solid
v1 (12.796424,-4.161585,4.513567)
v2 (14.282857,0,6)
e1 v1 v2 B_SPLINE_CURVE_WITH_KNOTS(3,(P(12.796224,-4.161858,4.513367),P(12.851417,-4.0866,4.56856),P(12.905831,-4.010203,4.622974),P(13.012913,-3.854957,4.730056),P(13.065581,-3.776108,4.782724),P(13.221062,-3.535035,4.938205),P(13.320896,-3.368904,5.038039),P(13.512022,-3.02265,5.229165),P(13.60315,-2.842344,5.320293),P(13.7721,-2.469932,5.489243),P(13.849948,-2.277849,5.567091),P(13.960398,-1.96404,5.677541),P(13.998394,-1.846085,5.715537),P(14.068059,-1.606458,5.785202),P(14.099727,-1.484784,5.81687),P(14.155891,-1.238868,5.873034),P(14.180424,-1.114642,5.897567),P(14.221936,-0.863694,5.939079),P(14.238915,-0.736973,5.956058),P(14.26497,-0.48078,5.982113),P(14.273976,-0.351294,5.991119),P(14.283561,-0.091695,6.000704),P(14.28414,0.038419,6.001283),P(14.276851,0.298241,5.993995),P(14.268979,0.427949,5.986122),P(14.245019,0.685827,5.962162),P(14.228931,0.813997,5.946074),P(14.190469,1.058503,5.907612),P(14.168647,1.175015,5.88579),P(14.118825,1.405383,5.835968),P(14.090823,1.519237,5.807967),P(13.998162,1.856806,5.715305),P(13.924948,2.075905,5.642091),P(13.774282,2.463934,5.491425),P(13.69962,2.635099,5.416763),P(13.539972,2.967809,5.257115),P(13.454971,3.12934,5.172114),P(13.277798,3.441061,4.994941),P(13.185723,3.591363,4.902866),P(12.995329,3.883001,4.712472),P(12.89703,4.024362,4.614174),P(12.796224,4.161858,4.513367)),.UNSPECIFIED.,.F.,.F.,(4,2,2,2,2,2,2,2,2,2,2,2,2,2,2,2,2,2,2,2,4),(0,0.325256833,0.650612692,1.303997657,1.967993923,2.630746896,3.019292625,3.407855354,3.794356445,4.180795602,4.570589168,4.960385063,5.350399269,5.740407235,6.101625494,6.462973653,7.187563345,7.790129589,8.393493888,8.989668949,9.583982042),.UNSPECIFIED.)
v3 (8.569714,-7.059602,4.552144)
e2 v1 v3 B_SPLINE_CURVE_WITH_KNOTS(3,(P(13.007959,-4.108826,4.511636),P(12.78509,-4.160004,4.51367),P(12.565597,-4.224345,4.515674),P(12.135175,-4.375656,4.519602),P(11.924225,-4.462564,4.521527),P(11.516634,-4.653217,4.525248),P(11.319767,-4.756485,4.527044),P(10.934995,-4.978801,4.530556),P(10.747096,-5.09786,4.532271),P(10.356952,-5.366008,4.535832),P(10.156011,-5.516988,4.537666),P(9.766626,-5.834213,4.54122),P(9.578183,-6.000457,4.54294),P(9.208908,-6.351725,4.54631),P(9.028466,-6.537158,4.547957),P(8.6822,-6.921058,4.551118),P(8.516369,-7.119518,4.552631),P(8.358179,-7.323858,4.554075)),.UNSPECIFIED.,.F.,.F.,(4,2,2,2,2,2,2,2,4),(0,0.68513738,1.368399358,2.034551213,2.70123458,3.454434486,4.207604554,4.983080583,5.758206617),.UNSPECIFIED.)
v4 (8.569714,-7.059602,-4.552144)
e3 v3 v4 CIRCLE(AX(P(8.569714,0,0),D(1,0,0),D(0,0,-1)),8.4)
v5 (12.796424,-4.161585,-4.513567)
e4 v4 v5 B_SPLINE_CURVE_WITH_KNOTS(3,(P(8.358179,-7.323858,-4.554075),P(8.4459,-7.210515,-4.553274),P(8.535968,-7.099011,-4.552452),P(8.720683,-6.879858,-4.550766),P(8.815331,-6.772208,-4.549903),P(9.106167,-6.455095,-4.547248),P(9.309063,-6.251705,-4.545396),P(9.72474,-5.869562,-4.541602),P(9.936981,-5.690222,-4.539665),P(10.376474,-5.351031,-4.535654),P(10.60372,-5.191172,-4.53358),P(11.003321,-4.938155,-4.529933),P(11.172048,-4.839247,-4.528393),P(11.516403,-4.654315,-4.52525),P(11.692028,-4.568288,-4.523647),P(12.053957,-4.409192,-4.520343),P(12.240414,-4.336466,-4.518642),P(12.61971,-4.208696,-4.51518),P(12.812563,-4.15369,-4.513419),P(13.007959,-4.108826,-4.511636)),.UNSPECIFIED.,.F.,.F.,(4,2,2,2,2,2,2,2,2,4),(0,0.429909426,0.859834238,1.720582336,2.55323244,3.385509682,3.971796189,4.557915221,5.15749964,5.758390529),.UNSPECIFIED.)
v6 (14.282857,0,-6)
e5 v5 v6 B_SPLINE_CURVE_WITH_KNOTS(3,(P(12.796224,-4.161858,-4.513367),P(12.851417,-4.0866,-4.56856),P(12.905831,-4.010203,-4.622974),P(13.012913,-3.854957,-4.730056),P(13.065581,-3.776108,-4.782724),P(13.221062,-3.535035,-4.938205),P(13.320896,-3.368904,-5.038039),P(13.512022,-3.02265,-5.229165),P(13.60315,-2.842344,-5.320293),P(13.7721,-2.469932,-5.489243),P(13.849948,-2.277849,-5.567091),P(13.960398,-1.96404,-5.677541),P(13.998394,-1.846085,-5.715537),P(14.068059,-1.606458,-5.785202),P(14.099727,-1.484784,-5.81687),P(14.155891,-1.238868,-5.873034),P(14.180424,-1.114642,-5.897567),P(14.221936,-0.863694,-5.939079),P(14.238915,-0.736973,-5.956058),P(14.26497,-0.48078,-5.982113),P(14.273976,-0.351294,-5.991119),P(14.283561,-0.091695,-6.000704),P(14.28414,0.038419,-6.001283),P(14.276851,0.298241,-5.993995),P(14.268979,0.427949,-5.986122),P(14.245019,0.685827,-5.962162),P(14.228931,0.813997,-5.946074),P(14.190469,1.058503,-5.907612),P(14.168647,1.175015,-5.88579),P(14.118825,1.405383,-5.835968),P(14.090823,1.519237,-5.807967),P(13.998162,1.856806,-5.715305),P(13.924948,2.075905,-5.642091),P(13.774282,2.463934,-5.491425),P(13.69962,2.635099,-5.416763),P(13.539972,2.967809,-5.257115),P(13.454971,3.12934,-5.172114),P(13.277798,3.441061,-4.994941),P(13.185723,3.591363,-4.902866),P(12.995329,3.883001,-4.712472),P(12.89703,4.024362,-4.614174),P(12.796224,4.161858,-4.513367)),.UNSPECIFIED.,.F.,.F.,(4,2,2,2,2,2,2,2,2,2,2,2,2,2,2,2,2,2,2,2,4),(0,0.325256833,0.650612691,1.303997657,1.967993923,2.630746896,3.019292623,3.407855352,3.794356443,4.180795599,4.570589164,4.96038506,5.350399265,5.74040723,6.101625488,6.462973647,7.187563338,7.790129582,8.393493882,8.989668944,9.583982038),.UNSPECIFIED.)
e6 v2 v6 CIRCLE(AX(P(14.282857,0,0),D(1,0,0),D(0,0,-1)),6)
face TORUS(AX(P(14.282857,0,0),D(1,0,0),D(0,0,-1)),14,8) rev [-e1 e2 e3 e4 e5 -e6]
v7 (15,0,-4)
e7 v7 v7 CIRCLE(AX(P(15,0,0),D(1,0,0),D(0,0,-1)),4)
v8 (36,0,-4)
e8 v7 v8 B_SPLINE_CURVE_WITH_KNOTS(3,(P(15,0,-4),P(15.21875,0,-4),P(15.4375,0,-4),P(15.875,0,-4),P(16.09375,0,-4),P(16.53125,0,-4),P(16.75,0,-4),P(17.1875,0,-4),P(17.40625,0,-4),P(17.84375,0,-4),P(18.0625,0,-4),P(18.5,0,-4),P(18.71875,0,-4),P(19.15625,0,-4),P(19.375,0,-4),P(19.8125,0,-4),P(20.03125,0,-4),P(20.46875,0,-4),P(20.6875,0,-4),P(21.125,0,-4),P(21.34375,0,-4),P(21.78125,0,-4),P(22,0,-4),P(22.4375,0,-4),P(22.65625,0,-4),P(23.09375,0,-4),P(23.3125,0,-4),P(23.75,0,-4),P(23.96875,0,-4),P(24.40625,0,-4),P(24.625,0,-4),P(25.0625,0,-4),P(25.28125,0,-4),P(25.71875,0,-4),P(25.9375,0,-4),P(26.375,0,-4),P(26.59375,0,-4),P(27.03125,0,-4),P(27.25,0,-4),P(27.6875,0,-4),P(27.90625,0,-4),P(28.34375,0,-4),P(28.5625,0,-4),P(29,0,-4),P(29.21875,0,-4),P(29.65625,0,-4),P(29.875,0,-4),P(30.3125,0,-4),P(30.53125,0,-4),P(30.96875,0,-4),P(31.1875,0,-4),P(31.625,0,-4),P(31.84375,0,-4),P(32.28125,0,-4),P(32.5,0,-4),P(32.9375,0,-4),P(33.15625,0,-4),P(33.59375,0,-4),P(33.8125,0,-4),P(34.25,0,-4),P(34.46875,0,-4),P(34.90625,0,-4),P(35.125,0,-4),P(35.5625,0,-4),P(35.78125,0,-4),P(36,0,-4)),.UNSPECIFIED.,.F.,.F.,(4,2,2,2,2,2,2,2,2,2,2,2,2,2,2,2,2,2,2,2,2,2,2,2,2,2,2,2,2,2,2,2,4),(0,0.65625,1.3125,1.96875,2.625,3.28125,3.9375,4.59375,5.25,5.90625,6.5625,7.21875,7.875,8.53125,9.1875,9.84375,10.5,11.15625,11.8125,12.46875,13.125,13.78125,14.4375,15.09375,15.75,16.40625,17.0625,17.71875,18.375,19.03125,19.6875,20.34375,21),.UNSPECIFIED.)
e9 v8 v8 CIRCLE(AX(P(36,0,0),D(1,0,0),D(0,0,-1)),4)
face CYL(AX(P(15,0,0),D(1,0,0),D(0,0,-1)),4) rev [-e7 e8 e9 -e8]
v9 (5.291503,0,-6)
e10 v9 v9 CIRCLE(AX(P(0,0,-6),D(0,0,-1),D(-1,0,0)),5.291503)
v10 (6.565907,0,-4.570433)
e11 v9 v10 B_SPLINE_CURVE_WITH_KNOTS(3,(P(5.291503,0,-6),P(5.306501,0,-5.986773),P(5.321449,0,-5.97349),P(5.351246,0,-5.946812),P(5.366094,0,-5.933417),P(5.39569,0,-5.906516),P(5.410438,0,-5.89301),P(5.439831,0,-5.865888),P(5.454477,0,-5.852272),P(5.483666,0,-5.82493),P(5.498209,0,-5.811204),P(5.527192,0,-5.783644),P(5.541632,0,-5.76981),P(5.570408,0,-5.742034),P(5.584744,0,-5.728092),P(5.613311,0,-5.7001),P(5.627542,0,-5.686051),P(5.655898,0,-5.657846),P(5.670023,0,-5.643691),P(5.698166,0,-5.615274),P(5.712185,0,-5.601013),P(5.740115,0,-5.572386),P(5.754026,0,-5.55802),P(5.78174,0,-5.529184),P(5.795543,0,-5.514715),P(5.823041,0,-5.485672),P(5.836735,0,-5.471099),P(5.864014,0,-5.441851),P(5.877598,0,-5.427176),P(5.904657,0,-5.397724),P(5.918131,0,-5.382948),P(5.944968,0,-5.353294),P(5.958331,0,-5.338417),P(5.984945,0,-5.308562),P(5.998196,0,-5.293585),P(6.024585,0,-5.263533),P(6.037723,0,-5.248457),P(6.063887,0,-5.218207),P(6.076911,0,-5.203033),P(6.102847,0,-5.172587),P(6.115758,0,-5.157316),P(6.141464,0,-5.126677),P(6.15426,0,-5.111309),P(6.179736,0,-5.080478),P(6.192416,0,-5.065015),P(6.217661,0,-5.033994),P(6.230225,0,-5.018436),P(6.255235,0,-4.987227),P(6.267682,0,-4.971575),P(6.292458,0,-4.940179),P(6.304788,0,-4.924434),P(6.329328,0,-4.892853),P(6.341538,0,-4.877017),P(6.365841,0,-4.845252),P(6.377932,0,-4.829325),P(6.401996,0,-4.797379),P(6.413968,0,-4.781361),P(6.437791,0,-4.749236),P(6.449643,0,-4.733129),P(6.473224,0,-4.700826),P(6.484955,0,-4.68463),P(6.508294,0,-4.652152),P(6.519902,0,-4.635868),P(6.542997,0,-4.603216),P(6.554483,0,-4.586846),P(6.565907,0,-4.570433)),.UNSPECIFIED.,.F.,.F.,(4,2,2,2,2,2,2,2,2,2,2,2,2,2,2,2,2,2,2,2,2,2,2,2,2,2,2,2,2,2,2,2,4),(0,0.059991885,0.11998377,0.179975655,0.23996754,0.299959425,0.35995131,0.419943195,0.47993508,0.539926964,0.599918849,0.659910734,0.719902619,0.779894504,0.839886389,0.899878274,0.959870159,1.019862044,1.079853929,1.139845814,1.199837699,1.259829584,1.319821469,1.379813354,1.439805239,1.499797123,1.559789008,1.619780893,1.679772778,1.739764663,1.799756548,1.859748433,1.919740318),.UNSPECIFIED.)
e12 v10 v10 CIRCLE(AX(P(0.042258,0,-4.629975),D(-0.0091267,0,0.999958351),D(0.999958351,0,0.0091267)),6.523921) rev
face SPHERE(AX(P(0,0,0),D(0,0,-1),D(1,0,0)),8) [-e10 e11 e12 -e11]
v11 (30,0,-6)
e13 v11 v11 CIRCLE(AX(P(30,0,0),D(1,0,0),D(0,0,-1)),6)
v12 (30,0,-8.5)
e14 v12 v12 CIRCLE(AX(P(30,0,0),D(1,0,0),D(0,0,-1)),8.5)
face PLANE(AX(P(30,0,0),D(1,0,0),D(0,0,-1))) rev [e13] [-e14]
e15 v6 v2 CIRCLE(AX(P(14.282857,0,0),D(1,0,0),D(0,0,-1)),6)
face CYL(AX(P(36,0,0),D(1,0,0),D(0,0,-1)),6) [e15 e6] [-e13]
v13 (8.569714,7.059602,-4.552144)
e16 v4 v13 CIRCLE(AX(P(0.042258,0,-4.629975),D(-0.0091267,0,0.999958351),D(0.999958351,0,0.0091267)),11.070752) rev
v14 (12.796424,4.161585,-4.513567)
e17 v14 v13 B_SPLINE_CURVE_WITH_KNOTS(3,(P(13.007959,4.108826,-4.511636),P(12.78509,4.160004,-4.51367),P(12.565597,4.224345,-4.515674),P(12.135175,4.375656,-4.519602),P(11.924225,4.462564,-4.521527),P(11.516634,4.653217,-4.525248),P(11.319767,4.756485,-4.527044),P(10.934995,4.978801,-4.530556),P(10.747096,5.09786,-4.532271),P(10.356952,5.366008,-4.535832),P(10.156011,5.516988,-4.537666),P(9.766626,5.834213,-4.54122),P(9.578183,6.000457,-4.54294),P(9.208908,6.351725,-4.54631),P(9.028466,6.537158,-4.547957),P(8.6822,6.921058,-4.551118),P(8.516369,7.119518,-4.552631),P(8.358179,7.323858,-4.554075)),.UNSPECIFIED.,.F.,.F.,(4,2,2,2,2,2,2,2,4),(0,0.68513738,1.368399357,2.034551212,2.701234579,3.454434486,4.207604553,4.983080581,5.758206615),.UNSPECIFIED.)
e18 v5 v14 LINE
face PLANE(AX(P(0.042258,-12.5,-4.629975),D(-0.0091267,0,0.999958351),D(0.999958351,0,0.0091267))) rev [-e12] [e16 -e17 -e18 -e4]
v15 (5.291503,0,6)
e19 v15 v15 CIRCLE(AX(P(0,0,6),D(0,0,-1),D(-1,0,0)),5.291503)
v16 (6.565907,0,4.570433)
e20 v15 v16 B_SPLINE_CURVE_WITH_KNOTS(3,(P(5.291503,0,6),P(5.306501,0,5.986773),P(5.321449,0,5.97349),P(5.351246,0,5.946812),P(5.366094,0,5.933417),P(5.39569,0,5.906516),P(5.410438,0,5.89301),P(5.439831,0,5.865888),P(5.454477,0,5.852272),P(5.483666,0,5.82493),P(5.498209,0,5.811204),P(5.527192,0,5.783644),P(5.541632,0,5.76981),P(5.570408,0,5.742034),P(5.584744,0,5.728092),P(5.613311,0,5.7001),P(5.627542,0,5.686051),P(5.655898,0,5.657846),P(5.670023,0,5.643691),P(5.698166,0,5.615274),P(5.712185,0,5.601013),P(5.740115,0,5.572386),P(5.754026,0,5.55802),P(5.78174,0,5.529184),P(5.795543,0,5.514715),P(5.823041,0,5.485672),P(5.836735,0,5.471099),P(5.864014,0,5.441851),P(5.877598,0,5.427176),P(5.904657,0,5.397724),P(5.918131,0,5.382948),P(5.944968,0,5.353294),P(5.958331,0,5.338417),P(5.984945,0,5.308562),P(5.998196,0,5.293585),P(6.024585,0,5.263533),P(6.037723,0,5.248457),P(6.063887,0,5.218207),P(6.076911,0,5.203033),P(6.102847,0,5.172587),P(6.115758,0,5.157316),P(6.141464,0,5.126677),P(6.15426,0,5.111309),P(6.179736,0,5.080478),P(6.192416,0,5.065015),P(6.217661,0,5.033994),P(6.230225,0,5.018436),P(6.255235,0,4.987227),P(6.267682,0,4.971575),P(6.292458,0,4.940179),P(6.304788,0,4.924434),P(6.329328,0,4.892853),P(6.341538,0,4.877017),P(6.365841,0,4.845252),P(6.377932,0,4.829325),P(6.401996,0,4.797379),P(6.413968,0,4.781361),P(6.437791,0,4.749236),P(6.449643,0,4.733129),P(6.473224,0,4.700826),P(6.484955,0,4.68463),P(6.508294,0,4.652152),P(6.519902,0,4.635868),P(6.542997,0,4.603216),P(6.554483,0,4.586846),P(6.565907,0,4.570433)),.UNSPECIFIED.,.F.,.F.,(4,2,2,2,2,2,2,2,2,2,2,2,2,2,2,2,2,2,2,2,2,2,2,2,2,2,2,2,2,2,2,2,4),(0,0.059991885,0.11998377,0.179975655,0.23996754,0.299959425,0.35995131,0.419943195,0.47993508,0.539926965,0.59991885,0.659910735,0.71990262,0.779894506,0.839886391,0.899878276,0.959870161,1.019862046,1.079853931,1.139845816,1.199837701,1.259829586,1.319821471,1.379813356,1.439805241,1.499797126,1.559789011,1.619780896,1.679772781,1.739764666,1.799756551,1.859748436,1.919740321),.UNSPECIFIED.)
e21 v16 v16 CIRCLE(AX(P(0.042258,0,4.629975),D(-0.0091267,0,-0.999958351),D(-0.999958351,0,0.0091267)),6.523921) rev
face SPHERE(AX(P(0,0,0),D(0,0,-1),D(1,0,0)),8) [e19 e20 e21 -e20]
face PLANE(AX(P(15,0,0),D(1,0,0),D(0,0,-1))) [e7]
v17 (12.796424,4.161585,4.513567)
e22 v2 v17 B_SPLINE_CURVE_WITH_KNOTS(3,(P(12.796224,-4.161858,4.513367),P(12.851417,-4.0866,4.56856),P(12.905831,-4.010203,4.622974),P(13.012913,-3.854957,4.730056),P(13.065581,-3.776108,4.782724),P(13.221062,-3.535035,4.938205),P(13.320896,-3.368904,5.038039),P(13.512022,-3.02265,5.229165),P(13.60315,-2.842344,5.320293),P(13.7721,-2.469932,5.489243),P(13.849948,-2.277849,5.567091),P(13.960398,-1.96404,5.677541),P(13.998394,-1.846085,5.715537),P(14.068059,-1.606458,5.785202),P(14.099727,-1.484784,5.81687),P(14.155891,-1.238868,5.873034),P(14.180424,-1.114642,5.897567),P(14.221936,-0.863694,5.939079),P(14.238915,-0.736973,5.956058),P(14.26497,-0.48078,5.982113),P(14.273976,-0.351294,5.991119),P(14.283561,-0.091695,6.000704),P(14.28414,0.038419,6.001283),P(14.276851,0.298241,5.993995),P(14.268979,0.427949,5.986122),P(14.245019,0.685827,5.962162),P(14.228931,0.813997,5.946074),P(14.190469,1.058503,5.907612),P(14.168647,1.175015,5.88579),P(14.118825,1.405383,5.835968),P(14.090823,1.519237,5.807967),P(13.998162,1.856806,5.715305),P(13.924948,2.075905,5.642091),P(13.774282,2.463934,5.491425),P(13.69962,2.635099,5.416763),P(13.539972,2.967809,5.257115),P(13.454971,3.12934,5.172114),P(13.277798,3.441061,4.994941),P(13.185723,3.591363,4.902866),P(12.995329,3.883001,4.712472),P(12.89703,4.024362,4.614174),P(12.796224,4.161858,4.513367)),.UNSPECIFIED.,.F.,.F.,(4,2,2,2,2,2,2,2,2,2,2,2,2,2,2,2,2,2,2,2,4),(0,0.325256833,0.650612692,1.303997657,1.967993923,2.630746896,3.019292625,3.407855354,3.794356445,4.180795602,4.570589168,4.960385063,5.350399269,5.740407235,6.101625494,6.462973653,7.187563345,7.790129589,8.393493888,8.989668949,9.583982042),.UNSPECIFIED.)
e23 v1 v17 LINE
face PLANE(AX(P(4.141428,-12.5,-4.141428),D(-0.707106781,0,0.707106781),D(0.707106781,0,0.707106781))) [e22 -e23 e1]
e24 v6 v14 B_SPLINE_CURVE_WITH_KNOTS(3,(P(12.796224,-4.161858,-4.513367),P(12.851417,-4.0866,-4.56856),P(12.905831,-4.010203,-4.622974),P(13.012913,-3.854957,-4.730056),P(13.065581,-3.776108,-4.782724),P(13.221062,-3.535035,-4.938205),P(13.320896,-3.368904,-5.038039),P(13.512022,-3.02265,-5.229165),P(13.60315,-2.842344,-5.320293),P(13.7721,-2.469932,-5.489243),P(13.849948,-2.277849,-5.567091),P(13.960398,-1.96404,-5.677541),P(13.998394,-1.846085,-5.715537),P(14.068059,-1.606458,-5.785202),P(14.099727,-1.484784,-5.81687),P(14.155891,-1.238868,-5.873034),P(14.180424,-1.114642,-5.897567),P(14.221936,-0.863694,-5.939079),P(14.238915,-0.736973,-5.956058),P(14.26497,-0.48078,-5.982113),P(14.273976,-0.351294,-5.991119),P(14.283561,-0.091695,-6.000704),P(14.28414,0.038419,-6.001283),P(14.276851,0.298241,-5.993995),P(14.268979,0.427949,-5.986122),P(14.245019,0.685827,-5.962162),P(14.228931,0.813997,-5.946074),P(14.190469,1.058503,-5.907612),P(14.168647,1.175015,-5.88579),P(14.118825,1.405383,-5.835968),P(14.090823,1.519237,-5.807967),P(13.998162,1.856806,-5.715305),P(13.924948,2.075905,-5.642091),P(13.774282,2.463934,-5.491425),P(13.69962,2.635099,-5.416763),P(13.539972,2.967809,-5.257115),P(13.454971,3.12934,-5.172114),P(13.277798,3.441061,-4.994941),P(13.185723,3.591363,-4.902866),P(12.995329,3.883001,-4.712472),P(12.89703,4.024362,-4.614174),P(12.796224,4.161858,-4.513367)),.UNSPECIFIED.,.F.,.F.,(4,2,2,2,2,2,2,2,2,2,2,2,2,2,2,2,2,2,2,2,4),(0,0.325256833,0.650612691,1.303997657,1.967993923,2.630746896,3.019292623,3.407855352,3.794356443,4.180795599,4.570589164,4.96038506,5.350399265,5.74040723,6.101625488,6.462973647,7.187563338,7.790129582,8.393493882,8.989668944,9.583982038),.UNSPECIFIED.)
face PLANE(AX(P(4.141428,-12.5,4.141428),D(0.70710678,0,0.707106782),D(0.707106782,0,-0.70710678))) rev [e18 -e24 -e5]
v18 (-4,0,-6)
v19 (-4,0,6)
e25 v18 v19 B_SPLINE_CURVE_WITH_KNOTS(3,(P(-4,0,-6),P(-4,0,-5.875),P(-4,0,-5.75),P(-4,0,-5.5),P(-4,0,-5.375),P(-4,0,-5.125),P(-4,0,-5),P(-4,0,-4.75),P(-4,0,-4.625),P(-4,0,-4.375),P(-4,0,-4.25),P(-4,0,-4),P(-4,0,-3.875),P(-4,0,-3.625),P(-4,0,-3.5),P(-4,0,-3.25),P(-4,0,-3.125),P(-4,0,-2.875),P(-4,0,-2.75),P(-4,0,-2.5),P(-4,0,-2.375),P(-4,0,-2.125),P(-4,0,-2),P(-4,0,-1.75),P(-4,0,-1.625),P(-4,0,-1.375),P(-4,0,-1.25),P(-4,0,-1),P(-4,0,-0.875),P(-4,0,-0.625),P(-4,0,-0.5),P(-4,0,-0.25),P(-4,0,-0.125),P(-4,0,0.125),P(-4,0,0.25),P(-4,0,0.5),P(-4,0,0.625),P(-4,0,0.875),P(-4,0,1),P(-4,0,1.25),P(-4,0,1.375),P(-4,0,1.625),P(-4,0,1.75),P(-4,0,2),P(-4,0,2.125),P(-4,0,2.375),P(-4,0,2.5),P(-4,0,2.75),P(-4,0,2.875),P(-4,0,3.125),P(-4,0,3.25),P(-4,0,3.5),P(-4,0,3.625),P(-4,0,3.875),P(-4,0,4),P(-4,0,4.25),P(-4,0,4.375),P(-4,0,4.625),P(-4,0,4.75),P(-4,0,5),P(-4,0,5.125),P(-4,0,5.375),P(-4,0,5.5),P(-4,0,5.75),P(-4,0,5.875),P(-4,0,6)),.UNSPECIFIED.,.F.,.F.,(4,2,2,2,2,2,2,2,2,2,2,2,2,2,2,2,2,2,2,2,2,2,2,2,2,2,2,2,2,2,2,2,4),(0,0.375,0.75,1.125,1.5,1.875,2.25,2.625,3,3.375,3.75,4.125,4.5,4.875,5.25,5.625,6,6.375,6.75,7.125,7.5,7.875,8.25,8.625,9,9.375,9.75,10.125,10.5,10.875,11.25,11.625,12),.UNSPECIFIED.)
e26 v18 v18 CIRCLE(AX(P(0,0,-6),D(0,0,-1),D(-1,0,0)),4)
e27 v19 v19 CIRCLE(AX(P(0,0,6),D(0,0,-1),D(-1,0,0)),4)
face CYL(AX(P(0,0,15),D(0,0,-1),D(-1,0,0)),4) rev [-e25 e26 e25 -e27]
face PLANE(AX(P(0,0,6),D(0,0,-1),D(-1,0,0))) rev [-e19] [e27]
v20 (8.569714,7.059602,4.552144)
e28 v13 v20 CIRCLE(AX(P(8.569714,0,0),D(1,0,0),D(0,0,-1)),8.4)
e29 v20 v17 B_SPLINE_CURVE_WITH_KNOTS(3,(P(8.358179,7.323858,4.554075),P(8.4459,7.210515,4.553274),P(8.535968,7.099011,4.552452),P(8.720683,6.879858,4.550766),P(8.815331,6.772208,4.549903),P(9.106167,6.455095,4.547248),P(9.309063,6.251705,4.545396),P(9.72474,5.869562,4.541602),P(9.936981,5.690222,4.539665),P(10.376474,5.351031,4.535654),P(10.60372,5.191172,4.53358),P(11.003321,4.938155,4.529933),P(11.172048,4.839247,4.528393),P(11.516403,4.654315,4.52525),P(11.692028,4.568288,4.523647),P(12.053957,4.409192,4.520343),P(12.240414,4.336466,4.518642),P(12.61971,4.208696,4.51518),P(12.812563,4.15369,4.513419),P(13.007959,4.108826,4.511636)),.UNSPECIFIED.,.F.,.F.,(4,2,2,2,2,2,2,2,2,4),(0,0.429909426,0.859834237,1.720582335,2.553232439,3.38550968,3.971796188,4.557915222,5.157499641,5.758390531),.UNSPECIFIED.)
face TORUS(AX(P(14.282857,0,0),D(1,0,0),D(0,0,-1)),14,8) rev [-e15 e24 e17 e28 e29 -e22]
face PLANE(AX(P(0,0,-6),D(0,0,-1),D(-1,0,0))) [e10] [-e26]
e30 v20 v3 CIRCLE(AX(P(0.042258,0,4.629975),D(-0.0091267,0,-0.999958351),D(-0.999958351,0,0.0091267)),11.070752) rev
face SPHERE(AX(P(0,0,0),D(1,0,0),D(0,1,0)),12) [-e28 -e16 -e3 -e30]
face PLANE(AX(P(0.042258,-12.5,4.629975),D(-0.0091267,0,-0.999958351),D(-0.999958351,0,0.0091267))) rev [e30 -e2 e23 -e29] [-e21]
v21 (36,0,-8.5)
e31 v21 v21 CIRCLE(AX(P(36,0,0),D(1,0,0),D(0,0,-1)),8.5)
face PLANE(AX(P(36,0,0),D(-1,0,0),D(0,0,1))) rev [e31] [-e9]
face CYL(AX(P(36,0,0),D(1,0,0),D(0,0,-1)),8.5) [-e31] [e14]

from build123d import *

# Parameters (mm, degrees)
CUT_EXTRUDE_1_DEPTH = 12.5
SKETCH_4_R          = 4
CUT_EXTRUDE_2_DEPTH = 21
SKETCH_6_R          = 4
CUT_EXTRUDE_3_DEPTH = 21


with BuildPart() as part:
    # 草图1 → 旋转3 (revolve)
    with BuildSketch(Plane.XY):
        with BuildLine():
            Line((36, 0), (36, 8.5))
            Line((36, 8.5), (30, 8.5))
            Line((30, 8.5), (30, 6))
            Line((30, 6), (14.282856857, 6))
            ThreePointArc((14.282856857, 6), (11.18447018, 6.624364434), (8.569714114, 8.4))
            ThreePointArc((8.569714114, 8.4), (-4.536707541, 11.109378231), (-12, 0))
            Line((-12, 0), (-4, 0))
            ThreePointArc((-4, 0), (0, 4), (4, 0))
            Line((4, 0), (36, 0))
        make_face()
    revolve(axis=Axis((36, 0, 0), (-1, 0, 0)))

    # 草图2 → 切除-拉伸1 (cut, symmetric)
    with BuildSketch(Plane(origin=(0, 0, 0), x_dir=(1, 0, 0), z_dir=(0, 1, 0))):
        with BuildLine():
            Line((12.79642365, 4.513566798), (14.282856857, 6))
            Line((14.282856857, 6), (5.630326423, 10.597142276))
            ThreePointArc((5.630326424, 10.597142276), (-3.985808769, 11.318715853), (-11.028032539, 4.731014522))
            Line((-11.028032539, 4.731014521), (-6.48139111, 4.68951696))
            Line((-6.48139111, 4.68951696), (12.79642365, 4.513566798))
        make_face()
        with BuildLine():
            Line((5.630326419, -10.597142273), (14.282856857, -6))
            Line((14.282856857, -6), (12.796423652, -4.513566795))
            Line((12.796423652, -4.513566795), (-6.481391109, -4.689516958))
            Line((-6.481391109, -4.689516958), (-11.028032538, -4.731014519))
            ThreePointArc((-11.028032538, -4.731014519), (-3.98580877, -11.318715847), (5.630326419, -10.597142274))
        make_face()
    extrude(amount=CUT_EXTRUDE_1_DEPTH, both=True, mode=Mode.SUBTRACT)

    # 草图3 → 旋转6 (revolve)
    with BuildSketch(Plane(origin=(0, 0, 0), x_dir=(1, 0, 0), z_dir=(0, 1, 0))):
        with BuildLine():
            Line((6.570843405, -4.563333972), (6.570843405, 4.563333972))
            ThreePointArc((6.570843405, 4.563333972), (5.974513841, 5.320261682), (5.291502622, 6))
            Line((5.291502622, 6), (0, 6))
            Line((0, 6), (0, -6))
            Line((0, -6), (5.291502622, -6))
            ThreePointArc((5.291502622, -6), (5.974513841, -5.320261682), (6.570843405, -4.563333972))
        make_face()
    revolve(axis=Axis((0, 0, -6), (0, 0, 1)))

    # 草图4 → 切除-拉伸2 (cut)
    with BuildSketch(Plane(origin=(0, 0, -6), x_dir=(-1, 0, 0), z_dir=(0, 0, -1))):
        Circle(SKETCH_4_R)
    extrude(amount=-CUT_EXTRUDE_2_DEPTH, mode=Mode.SUBTRACT)

    # 草图6 → 切除-拉伸3 (cut)
    with BuildSketch(Plane(origin=(36, 0, 0), x_dir=(0, 0, -1), z_dir=(1, 0, 0))):
        Circle(SKETCH_6_R)
    extrude(amount=-CUT_EXTRUDE_3_DEPTH, mode=Mode.SUBTRACT)


solid = part.part
